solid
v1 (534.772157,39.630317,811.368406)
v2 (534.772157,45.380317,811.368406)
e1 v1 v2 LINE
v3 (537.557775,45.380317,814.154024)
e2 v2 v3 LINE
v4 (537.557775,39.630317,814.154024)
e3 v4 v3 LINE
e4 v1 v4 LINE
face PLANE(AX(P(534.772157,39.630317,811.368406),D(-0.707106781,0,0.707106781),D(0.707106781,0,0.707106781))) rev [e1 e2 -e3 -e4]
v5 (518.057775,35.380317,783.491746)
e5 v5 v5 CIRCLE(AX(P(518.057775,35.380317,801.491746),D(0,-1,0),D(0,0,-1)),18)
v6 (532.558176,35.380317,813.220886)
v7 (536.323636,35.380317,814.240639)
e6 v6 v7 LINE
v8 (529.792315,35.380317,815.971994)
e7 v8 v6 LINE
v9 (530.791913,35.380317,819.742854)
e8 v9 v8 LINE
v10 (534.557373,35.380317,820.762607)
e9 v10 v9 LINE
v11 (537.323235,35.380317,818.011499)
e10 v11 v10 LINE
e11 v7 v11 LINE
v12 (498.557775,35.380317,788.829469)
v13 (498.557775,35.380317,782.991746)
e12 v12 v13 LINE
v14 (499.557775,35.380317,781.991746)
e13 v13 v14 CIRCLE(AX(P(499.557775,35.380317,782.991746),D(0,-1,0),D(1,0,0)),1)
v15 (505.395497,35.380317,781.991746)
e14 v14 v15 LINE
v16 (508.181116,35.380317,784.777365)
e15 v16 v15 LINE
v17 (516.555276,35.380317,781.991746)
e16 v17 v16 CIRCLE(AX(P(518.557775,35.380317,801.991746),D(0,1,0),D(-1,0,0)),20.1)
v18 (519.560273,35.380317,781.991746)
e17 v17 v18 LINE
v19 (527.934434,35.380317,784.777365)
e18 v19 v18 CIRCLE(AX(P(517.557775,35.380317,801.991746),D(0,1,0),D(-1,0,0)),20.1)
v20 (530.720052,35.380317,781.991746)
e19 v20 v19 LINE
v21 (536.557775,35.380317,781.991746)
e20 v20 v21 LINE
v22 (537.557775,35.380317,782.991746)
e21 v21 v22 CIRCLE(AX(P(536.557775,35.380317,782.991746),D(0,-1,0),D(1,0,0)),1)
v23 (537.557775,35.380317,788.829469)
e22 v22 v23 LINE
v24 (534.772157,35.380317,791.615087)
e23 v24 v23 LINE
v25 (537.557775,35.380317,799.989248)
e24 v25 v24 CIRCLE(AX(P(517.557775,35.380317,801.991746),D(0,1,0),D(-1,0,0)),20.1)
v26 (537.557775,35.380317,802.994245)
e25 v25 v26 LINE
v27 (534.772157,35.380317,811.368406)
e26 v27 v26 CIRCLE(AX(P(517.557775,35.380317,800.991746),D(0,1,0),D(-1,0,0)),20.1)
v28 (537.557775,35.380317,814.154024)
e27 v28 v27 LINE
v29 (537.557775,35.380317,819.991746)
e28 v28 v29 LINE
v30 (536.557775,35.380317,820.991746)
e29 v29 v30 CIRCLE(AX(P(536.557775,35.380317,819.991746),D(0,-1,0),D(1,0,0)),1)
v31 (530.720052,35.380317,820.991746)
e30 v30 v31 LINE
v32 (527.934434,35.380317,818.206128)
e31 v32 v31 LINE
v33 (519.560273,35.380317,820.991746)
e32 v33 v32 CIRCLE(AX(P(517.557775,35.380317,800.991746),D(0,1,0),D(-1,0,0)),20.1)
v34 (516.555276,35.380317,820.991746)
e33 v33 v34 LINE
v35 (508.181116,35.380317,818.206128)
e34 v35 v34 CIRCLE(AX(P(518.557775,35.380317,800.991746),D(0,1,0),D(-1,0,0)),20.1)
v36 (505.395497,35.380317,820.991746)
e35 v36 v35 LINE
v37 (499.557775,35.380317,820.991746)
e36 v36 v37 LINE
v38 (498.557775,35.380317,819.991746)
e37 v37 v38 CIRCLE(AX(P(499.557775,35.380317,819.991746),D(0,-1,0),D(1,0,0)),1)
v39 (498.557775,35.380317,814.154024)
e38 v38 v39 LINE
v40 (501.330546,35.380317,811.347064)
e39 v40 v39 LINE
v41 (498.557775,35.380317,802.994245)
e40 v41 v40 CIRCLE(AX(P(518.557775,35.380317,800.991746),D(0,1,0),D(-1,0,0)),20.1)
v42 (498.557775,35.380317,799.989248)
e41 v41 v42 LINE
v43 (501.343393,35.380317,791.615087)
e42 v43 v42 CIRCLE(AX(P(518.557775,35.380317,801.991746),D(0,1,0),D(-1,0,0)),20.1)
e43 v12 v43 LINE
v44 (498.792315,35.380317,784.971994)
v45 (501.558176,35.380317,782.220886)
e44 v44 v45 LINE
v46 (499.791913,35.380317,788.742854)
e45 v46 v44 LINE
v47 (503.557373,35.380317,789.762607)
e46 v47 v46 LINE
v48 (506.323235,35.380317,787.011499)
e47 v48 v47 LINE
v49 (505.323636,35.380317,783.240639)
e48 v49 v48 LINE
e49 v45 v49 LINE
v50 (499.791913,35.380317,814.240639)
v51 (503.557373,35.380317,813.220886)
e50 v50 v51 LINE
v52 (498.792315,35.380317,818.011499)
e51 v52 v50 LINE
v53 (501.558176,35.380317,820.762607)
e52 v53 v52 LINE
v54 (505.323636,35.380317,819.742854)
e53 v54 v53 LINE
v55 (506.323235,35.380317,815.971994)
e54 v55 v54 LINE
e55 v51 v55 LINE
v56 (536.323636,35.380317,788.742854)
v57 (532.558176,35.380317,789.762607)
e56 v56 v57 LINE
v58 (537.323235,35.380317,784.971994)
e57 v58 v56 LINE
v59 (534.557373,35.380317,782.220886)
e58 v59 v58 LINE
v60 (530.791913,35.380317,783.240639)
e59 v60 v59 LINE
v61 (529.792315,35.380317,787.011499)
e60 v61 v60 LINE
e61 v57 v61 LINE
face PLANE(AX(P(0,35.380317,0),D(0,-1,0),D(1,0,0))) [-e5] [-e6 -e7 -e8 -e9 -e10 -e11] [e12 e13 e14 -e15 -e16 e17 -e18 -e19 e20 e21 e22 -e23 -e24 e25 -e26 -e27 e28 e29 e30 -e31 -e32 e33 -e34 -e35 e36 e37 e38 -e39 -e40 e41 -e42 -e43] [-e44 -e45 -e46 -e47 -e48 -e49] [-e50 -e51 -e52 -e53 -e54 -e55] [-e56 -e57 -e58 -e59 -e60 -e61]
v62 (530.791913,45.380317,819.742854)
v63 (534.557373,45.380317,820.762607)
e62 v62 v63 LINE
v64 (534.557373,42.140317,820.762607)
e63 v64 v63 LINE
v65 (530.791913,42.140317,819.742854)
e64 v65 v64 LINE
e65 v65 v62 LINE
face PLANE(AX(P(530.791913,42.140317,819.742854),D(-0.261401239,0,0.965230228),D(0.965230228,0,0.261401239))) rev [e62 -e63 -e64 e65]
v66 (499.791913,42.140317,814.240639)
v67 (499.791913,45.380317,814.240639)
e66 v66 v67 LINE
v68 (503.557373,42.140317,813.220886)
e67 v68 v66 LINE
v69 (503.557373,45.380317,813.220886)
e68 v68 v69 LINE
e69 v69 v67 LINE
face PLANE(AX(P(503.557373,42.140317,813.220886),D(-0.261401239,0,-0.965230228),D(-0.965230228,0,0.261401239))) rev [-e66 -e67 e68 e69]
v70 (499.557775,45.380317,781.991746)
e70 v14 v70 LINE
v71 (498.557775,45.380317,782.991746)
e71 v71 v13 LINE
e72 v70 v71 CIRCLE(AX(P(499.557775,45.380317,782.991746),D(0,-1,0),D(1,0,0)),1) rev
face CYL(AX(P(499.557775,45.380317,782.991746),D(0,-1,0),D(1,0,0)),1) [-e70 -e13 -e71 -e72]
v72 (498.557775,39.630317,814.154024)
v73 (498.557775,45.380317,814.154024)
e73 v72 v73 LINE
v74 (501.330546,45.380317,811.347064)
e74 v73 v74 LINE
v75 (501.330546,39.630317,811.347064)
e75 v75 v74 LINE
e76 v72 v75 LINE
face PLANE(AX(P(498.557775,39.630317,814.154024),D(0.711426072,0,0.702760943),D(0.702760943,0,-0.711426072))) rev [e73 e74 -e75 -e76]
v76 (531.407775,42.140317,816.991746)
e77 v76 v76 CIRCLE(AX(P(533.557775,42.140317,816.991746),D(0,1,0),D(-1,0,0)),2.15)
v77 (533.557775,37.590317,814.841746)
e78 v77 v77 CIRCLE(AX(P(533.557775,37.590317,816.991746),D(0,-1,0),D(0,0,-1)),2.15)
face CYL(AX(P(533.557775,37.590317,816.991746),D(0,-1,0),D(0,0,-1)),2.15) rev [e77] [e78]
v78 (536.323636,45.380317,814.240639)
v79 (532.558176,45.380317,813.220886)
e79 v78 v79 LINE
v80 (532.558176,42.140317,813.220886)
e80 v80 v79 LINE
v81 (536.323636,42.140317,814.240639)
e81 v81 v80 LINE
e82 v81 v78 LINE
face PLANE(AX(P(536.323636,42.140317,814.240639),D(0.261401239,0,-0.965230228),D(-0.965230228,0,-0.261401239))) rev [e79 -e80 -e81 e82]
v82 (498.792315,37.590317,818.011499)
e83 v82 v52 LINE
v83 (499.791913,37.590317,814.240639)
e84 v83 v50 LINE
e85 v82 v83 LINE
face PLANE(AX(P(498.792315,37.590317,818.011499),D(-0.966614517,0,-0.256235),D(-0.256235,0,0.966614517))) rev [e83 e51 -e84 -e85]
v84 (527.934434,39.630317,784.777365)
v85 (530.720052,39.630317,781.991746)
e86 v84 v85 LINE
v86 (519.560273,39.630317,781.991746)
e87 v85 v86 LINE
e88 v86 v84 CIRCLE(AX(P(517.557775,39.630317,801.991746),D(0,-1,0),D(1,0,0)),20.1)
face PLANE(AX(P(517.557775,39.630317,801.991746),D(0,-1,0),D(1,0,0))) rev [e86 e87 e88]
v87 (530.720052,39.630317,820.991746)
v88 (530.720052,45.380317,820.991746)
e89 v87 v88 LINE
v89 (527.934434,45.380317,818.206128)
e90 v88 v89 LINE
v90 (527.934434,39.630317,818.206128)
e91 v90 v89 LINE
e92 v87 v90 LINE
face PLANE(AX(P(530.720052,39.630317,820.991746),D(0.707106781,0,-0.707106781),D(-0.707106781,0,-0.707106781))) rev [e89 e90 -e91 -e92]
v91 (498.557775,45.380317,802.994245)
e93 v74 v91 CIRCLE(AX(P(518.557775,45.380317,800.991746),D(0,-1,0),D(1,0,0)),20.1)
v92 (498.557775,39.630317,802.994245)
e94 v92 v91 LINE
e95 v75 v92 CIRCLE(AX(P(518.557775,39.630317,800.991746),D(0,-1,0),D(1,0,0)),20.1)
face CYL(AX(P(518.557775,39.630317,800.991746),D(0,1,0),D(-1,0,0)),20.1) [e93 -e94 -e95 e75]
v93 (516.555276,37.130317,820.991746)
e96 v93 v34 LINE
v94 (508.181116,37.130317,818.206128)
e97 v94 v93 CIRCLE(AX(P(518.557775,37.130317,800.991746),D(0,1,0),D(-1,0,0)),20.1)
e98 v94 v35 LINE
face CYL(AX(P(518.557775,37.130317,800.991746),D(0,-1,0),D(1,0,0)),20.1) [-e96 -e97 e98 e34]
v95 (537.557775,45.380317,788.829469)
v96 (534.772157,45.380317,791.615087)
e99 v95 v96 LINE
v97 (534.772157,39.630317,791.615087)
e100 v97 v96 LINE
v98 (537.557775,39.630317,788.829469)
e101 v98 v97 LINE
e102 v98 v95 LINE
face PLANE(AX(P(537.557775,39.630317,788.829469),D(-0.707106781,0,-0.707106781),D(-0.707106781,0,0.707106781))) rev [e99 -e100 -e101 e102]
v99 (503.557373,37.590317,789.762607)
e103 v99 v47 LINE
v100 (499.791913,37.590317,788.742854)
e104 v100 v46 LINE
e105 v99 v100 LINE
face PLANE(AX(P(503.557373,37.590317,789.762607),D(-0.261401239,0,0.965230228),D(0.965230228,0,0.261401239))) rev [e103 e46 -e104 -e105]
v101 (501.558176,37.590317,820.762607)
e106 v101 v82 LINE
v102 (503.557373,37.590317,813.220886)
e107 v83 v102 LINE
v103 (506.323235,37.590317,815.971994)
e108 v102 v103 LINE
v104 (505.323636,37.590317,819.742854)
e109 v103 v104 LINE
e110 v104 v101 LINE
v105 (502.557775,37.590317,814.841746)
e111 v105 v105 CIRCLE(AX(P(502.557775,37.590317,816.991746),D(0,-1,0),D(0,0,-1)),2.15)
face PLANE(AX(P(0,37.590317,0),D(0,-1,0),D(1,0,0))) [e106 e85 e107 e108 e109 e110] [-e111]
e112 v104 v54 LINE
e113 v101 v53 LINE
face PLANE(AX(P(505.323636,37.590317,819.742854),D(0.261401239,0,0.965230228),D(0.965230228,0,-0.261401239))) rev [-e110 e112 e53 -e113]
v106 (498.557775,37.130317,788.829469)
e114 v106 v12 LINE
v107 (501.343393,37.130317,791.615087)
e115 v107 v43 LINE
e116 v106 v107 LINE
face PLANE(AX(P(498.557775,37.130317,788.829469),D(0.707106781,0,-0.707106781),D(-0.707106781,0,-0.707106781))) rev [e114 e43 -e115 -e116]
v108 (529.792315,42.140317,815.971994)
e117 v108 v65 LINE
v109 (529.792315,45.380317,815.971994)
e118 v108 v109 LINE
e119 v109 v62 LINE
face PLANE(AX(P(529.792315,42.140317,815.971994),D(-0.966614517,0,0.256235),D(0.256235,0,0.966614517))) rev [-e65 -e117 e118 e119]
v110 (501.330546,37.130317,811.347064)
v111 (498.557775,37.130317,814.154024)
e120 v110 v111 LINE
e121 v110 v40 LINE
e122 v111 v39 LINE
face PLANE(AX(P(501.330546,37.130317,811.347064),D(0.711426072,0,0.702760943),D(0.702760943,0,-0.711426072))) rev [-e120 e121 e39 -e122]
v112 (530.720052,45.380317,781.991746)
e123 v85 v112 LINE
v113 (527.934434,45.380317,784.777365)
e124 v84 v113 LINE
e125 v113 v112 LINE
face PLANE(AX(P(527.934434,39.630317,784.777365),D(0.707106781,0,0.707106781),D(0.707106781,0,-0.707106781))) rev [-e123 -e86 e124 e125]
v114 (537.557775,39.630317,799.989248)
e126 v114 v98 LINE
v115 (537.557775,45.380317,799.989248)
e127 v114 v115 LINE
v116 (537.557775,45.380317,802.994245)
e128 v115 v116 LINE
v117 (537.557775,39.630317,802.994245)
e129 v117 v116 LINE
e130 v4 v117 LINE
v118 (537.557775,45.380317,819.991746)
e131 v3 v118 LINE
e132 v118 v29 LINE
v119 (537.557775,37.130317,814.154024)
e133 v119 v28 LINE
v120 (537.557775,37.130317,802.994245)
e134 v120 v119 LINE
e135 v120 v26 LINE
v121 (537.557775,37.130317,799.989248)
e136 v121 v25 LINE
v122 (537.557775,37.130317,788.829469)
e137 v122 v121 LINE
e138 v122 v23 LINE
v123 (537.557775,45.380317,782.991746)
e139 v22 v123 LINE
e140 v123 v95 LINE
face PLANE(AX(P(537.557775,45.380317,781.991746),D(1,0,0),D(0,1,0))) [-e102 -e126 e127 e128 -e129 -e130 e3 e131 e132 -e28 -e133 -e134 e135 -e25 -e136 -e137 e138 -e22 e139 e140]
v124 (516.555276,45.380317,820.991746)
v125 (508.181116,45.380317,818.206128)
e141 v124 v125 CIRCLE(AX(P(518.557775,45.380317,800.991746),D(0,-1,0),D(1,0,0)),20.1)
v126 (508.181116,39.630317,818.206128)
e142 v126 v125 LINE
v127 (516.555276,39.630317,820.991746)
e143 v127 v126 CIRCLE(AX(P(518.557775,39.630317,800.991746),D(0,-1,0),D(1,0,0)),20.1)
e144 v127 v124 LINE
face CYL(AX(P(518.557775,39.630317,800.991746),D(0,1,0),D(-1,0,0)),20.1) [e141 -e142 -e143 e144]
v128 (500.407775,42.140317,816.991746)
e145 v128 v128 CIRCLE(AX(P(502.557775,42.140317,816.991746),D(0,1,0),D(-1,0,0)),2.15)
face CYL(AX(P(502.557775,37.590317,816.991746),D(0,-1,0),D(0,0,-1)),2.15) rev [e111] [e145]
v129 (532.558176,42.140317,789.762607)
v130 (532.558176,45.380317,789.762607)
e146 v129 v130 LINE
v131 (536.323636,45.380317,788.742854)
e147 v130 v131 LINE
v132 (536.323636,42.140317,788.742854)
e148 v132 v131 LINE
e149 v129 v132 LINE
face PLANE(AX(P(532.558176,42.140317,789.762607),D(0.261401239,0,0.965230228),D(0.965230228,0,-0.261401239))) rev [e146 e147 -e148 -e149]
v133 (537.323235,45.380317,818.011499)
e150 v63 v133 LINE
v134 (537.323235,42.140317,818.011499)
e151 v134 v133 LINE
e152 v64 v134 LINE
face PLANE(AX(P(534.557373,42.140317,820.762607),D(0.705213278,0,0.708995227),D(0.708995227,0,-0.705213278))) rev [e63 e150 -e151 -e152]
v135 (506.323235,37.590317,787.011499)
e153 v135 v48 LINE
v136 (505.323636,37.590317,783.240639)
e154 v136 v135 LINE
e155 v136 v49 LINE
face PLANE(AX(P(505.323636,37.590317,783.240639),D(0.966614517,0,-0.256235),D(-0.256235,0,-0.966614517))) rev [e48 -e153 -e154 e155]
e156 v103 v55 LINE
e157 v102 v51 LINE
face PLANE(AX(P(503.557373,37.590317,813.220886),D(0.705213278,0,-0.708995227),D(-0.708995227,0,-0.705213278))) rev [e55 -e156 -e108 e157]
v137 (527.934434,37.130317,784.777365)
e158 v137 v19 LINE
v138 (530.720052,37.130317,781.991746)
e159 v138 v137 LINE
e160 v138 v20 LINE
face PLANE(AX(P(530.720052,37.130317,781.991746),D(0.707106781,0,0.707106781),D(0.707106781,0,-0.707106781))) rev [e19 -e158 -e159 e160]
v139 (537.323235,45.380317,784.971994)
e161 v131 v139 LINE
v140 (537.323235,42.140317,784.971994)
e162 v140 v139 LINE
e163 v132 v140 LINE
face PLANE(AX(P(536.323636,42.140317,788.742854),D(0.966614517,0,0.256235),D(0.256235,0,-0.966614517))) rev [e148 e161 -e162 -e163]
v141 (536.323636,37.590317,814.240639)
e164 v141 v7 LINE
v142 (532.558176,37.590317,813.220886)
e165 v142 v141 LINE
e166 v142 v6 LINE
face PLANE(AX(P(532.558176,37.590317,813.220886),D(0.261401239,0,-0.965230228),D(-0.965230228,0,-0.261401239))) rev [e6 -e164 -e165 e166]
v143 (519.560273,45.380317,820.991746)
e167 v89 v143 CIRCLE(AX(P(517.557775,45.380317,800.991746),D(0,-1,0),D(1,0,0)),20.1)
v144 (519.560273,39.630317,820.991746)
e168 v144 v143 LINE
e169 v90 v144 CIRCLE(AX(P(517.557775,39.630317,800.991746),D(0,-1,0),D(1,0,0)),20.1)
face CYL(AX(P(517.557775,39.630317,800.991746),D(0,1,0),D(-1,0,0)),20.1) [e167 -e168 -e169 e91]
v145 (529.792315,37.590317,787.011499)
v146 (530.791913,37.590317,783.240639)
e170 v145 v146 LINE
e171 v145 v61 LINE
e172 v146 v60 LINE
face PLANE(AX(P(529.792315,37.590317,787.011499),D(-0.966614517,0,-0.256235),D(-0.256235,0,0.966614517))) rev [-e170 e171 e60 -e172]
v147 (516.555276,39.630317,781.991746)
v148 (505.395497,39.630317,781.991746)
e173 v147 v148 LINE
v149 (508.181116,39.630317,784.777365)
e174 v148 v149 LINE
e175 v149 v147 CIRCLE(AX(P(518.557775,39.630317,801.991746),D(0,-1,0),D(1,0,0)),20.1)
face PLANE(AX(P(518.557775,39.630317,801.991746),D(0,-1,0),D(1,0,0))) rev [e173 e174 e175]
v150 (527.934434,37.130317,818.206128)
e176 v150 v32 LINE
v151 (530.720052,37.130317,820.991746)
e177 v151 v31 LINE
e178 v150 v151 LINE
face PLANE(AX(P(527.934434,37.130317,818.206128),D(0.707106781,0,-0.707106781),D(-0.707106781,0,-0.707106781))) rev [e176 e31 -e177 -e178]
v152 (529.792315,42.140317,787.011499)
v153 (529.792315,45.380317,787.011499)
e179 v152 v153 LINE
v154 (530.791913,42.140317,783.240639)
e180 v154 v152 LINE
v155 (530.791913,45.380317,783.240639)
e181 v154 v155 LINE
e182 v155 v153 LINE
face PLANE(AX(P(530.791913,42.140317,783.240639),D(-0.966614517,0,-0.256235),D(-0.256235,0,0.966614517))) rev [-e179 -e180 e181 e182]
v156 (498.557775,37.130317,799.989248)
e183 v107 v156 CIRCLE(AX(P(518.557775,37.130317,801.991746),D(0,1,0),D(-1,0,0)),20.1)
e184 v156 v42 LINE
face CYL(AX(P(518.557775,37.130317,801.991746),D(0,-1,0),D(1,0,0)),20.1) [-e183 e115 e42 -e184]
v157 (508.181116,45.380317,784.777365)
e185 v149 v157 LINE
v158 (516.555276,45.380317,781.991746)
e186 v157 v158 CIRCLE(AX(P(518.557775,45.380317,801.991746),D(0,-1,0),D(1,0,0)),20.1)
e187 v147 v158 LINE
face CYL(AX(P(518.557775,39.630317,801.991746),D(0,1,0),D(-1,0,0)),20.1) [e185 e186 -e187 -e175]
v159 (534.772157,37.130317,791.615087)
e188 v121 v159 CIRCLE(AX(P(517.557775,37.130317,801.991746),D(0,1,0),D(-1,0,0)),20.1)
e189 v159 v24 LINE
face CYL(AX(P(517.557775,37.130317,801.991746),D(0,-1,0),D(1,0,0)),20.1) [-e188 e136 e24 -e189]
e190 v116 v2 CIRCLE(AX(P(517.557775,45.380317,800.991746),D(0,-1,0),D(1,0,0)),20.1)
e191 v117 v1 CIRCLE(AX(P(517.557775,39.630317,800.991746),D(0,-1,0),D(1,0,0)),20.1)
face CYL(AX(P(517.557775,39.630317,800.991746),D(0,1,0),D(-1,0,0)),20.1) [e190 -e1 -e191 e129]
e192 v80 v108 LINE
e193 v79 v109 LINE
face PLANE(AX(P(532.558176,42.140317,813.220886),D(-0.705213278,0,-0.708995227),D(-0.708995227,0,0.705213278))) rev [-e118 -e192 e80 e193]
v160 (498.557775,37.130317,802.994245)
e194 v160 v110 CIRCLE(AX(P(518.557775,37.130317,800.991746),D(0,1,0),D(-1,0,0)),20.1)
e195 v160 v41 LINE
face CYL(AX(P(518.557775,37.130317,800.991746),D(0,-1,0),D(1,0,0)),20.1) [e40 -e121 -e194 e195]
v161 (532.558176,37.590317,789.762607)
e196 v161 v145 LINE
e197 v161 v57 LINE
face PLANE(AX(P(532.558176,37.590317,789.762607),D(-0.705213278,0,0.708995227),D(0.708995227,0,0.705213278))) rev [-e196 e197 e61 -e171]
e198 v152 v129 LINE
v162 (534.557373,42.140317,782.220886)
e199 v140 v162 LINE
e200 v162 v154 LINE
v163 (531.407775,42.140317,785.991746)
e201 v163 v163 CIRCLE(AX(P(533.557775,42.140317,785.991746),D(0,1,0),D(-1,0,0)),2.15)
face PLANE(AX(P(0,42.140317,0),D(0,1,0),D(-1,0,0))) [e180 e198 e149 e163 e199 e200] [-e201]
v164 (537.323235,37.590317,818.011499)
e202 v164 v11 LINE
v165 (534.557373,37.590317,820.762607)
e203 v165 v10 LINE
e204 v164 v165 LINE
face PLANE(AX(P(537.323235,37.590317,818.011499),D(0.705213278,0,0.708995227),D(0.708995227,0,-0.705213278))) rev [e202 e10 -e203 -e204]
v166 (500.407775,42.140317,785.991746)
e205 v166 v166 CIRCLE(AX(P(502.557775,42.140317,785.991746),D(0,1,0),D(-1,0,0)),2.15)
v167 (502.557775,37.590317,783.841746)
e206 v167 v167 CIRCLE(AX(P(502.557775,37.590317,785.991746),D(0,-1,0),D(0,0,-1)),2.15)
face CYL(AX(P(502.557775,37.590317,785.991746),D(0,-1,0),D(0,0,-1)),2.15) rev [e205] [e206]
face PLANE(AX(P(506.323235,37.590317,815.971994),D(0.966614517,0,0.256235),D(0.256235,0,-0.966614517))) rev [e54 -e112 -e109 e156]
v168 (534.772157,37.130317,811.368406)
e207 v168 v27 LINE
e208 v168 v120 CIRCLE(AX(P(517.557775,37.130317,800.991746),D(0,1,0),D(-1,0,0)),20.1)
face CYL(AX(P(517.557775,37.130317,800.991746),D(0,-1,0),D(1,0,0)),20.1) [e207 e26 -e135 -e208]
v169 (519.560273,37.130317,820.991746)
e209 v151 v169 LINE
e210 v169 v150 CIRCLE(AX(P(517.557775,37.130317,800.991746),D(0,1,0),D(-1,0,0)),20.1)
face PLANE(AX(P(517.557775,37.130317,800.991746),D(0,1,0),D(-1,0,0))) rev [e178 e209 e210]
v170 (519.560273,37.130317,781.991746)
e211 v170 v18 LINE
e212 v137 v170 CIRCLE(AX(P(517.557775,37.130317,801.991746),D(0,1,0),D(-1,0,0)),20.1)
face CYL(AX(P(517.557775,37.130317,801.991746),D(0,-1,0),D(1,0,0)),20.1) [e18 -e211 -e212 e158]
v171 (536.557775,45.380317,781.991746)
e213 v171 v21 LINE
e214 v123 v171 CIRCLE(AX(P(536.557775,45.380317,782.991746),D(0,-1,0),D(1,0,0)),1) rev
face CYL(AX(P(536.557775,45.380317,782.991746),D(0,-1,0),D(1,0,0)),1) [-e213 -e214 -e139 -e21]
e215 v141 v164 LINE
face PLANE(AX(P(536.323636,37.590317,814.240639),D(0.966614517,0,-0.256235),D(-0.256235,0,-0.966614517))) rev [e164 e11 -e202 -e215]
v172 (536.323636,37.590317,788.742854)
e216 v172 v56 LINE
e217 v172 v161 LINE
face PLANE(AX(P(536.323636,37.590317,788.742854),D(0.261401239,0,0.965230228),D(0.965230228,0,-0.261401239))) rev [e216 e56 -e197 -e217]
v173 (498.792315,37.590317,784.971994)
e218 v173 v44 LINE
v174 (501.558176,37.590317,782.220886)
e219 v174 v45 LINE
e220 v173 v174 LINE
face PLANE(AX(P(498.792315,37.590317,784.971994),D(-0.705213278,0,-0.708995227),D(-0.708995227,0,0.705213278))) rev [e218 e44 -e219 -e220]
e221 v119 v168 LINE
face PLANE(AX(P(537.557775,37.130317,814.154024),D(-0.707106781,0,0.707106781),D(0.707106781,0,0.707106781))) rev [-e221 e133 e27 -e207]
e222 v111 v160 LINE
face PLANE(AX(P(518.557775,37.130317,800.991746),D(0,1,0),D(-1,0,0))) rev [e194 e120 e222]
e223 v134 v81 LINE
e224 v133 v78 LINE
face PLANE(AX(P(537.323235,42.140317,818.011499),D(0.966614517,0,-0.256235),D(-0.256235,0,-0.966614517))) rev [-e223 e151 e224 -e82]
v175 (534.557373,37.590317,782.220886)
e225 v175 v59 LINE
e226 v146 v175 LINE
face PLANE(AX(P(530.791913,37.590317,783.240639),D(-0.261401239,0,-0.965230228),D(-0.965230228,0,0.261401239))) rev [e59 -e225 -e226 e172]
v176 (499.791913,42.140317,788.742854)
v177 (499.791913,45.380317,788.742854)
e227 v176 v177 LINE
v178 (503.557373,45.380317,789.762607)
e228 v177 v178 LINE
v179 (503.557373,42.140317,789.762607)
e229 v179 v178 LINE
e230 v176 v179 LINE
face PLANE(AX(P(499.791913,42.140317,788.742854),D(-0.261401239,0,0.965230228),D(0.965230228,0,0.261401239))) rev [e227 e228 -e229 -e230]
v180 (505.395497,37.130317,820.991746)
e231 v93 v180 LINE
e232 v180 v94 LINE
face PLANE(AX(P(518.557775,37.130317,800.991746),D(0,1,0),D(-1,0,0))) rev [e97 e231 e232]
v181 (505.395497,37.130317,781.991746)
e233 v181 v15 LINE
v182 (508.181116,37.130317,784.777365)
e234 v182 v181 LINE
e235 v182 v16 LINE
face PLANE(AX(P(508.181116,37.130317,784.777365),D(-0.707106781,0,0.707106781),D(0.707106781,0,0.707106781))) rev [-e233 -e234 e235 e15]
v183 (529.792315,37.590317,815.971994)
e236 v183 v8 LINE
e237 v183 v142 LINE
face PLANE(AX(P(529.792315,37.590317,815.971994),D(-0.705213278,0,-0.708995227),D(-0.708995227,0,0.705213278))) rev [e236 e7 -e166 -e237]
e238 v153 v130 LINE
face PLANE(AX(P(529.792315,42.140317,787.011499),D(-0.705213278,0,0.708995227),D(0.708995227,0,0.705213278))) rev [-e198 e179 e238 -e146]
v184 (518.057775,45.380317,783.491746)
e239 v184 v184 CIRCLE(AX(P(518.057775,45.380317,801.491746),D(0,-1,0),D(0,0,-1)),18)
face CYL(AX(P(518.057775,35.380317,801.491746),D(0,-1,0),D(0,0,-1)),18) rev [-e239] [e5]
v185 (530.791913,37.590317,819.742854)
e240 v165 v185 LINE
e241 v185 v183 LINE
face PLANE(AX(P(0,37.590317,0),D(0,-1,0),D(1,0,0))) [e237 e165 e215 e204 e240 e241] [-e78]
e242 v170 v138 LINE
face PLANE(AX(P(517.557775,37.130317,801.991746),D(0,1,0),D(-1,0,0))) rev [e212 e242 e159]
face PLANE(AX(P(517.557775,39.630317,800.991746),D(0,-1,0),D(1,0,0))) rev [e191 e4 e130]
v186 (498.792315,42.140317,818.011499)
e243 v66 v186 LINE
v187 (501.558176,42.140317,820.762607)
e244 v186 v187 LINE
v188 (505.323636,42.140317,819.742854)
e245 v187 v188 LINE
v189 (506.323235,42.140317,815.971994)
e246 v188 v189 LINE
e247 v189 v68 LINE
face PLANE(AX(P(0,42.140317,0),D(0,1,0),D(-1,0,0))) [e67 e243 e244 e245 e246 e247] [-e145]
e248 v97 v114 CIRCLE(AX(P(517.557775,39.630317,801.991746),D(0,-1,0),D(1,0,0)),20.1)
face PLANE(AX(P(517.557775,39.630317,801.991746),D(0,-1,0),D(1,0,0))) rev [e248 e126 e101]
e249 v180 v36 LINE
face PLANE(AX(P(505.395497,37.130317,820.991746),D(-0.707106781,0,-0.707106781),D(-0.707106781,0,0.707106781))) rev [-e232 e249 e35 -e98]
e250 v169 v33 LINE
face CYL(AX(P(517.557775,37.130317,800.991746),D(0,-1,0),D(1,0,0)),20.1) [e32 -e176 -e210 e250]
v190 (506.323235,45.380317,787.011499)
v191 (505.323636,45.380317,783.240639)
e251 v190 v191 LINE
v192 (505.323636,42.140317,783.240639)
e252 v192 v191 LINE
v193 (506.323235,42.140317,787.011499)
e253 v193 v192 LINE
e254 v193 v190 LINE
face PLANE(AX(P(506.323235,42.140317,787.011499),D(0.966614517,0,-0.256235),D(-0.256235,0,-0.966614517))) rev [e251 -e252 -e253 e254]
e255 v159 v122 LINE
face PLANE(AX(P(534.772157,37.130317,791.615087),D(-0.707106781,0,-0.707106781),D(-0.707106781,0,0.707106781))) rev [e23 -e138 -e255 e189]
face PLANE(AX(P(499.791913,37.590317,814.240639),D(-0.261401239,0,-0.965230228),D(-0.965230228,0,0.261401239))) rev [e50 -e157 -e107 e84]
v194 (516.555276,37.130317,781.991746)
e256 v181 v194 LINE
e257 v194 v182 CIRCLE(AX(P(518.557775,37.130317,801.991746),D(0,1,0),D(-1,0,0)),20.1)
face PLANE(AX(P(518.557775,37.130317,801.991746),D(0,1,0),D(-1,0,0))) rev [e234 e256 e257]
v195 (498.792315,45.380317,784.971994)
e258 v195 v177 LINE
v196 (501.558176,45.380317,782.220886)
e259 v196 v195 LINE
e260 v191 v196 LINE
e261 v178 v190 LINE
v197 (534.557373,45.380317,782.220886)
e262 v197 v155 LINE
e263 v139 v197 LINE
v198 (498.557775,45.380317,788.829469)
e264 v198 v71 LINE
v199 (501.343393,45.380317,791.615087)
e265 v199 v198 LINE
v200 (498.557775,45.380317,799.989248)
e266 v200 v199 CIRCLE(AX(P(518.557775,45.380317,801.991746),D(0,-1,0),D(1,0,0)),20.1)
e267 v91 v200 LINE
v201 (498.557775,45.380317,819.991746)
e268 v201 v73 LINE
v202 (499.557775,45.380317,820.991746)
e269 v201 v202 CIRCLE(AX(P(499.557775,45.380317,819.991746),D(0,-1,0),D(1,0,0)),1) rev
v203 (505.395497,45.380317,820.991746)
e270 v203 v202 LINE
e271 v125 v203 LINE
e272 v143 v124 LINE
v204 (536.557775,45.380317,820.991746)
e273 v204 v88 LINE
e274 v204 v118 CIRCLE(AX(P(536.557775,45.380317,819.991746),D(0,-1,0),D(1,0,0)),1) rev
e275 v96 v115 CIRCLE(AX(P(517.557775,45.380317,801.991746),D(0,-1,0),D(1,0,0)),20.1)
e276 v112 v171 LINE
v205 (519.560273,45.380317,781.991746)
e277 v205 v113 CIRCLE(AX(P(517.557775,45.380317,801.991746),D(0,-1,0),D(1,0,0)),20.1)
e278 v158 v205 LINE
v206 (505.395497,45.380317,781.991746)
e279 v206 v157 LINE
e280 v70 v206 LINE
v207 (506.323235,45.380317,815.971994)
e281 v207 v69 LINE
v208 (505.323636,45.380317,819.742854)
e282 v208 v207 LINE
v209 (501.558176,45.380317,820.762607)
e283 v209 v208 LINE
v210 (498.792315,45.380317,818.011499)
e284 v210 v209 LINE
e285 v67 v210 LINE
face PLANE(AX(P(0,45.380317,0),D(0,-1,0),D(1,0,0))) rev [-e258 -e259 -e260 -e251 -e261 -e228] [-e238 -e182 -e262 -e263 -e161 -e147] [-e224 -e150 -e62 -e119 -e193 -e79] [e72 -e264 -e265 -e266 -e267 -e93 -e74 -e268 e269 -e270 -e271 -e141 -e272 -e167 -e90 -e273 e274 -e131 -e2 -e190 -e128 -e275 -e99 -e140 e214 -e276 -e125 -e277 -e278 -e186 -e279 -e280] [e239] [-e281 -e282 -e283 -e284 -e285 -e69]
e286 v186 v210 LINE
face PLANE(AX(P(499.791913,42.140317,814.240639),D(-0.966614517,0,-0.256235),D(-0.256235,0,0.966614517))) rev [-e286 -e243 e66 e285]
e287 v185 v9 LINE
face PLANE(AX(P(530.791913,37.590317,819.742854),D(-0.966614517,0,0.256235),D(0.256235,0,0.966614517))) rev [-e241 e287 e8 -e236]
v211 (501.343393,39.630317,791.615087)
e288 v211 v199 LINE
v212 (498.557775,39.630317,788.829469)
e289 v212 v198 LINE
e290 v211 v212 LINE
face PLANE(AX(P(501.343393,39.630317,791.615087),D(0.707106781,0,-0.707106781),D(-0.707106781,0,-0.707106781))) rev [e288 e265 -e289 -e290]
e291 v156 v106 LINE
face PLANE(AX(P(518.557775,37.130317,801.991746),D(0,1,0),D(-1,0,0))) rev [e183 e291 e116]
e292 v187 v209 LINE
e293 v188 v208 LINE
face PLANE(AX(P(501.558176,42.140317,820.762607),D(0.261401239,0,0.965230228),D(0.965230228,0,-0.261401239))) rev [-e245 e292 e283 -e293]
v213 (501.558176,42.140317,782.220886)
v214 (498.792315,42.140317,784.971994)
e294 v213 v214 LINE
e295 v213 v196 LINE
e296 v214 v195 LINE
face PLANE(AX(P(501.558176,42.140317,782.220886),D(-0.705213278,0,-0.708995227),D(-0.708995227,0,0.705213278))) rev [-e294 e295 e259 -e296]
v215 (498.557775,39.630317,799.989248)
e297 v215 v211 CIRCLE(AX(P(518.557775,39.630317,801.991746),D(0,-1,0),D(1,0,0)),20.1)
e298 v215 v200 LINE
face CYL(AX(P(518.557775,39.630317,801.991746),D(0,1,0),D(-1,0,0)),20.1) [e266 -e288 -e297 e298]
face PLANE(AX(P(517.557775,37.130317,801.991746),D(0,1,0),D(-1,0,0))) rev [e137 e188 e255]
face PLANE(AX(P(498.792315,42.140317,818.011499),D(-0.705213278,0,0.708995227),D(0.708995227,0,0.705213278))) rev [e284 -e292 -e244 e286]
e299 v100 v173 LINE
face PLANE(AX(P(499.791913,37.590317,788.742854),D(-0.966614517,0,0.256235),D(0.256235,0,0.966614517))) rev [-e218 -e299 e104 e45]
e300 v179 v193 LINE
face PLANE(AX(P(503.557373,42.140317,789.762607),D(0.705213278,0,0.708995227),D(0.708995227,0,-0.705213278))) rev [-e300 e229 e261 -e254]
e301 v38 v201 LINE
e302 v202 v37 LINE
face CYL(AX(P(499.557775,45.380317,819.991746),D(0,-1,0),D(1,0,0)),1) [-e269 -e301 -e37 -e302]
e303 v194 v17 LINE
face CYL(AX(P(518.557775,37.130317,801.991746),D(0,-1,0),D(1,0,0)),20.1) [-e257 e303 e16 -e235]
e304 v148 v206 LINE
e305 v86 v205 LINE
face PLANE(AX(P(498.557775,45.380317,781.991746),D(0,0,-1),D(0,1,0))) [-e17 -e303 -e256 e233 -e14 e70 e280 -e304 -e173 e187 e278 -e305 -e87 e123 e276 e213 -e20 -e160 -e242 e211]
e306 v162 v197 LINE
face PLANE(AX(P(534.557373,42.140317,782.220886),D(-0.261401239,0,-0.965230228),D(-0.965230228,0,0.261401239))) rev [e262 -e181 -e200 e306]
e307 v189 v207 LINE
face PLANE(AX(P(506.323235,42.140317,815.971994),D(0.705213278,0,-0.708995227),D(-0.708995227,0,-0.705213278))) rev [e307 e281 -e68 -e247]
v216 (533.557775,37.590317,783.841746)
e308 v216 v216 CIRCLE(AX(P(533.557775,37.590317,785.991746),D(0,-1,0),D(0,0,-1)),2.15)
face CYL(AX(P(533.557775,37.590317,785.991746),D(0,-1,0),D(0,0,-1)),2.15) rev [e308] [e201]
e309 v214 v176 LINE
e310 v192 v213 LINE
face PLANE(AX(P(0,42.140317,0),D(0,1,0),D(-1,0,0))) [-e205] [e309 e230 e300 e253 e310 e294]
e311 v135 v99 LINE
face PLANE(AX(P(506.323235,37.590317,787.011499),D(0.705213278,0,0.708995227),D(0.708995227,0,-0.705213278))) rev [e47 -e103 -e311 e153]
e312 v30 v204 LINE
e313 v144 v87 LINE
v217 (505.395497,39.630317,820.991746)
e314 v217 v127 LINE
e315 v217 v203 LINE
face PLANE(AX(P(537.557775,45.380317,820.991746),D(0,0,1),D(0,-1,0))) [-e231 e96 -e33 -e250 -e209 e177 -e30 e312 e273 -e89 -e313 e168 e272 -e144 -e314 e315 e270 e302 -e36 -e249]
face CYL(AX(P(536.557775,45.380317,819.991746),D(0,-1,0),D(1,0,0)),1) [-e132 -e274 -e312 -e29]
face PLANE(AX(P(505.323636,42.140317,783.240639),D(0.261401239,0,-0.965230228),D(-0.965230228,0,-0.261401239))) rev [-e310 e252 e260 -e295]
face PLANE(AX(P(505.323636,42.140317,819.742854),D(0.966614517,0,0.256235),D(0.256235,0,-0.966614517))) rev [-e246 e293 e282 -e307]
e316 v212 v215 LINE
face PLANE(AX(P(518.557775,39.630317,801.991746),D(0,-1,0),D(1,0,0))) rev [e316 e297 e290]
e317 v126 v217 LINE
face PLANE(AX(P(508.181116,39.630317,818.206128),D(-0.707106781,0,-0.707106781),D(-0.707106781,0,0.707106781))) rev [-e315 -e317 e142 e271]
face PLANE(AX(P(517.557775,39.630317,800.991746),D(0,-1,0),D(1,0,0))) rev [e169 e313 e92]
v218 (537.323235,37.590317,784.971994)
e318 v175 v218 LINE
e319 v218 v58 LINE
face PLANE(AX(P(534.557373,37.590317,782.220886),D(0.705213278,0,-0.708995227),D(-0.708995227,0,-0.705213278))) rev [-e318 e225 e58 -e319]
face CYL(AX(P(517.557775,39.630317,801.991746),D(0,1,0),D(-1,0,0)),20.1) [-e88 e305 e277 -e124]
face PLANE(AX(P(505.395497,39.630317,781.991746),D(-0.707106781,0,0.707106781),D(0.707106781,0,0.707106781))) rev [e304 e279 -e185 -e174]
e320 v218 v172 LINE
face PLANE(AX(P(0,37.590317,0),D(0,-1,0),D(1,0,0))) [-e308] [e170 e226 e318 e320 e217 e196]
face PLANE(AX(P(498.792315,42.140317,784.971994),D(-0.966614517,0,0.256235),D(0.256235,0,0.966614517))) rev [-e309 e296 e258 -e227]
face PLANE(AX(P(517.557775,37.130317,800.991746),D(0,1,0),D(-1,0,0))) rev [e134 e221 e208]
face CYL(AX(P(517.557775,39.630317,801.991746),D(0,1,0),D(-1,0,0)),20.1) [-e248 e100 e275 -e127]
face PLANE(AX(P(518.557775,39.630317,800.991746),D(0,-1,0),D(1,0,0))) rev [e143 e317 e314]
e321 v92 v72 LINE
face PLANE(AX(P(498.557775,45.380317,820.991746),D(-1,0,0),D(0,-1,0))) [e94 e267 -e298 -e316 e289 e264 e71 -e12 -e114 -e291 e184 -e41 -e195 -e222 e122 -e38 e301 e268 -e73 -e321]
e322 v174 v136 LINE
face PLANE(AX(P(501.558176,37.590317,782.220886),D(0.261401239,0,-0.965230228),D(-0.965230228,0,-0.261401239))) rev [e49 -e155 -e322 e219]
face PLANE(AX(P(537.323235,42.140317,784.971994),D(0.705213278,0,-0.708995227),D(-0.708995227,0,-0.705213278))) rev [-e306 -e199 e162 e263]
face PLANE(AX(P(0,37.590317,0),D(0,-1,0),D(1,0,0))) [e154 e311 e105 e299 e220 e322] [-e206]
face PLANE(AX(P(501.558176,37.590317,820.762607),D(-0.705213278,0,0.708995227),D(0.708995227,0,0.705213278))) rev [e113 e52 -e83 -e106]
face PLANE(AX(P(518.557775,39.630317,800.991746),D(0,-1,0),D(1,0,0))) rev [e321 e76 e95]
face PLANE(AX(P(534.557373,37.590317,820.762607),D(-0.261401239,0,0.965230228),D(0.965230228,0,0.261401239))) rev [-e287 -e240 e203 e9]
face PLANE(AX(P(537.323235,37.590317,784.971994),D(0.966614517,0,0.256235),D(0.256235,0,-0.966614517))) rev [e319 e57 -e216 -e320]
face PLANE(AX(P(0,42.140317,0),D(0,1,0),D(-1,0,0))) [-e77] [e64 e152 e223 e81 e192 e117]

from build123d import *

# Parameters (mm, degrees)
SKETCH1_W                      = 39
SKETCH1_H                      = 39
BOSS_EXTRUDE1_DEPTH            = 10
CUT_EXTRUDE1_DEPTH             = 5.75
CUT_EXTRUDE2_START             = -1.75
CUT_EXTRUDE2_DEPTH             = 1.75
CUT_EXTRUDE3_DEPTH             = 1.75
CUT_EXTRUDE4_START             = -5.75
CUT_EXTRUDE4_DEPTH             = 5.75
CUT_EXTRUDE5_START             = -1.75
CUT_EXTRUDE5_DEPTH             = 1.75
CUT_EXTRUDE6_DEPTH             = 5.75
CUT_EXTRUDE7_DEPTH             = 5.75
CUT_EXTRUDE8_START             = -1.75
CUT_EXTRUDE8_DEPTH             = 1.75
CUT_EXTRUDE9_START             = -1.75
CUT_EXTRUDE9_DEPTH             = 1.75
CUT_EXTRUDE10_DEPTH            = 5.75
CUT_EXTRUDE11_DEPTH            = 5.75
CUT_EXTRUDE12_START            = -1.75
CUT_EXTRUDE12_DEPTH            = 1.75
CUT_EXTRUDE13_START            = -5.75
CUT_EXTRUDE13_DEPTH            = 5.75
CUT_EXTRUDE14_DEPTH            = 1.75
CUT_EXTRUDE15_START            = -1.75
CUT_EXTRUDE15_DEPTH            = 1.75
CUT_EXTRUDE16_DEPTH            = 5.75
CUT_EXTRUDE17_DEPTH            = 2.21
CUT_EXTRUDE18_DEPTH            = 2.21
CUT_EXTRUDE19_DEPTH            = 2.21
CUT_EXTRUDE20_DEPTH            = 2.21
CUT_EXTRUDE21_DEPTH            = 3.24
CUT_EXTRUDE22_DEPTH            = 3.24
CUT_EXTRUDE23_DEPTH            = 3.24
CUT_EXTRUDE24_DEPTH            = 3.24
M33_CLEARANCE_HOLE1_D          = 36
F_4_3_4_3_DIAMETER_HOLE1_D     = 4.3
F_4_3_4_3_DIAMETER_HOLE1_DEPTH = 7.79
FILLET1_R                      = 1


with BuildPart() as part:
    # Sketch1 → Boss-Extrude1 (new body)
    with BuildSketch(Plane.XZ.offset(-35.380317461)):
        with Locations((518.057774839, 801.49174641)):
            Rectangle(SKETCH1_W, SKETCH1_H)
    extrude(amount=-BOSS_EXTRUDE1_DEPTH)

    # Sketch2 → Cut-Extrude1 (cut)
    with BuildSketch(Plane(origin=(0, 45.380317461, 0), x_dir=(-1, 0, 0), z_dir=(0, 1, 0))):
        with BuildLine():
            Line((-505.395497413, 781.99174641), (-508.181115567, 784.777364563))
            ThreePointArc((-508.181115567, 784.777364563), (-512.213422741, 782.919274193), (-516.555276399, 781.99174641))
            Line((-516.555276399, 781.99174641), (-505.395497413, 781.99174641))
        make_face()
    extrude(amount=-CUT_EXTRUDE1_DEPTH, mode=Mode.SUBTRACT)

    # Sketch3 → Cut-Extrude2 (cut)
    with BuildSketch(Plane.XZ.offset(-35.380317461).offset(CUT_EXTRUDE2_START)):
        with BuildLine():
            Line((508.181115567, 784.777364563), (505.395497413, 781.99174641))
            Line((505.395497413, 781.99174641), (516.555276399, 781.99174641))
            ThreePointArc((516.555276399, 781.99174641), (512.213422741, 782.919274193), (508.181115567, 784.777364563))
        make_face()
    extrude(amount=CUT_EXTRUDE2_DEPTH, mode=Mode.SUBTRACT)

    # Sketch4 → Cut-Extrude3 (cut)
    with BuildSketch(Plane.XZ.offset(-35.380317461)):
        with BuildLine():
            Line((530.720052265, 781.99174641), (527.934434111, 784.777364563))
            ThreePointArc((527.934434111, 784.777364563), (523.902126936, 782.919274193), (519.560273278, 781.99174641))
            Line((519.560273278, 781.99174641), (530.720052265, 781.99174641))
        make_face()
    extrude(amount=-CUT_EXTRUDE3_DEPTH, mode=Mode.SUBTRACT)

    # Sketch5 → Cut-Extrude4 (cut)
    with BuildSketch(Plane(origin=(0, 45.380317461, 0), x_dir=(-1, 0, 0), z_dir=(0, 1, 0)).offset(CUT_EXTRUDE4_START)):
        with BuildLine():
            Line((-527.934434111, 784.777364563), (-530.720052265, 781.99174641))
            Line((-530.720052265, 781.99174641), (-519.560273278, 781.99174641))
            ThreePointArc((-519.560273278, 781.99174641), (-523.902126936, 782.919274193), (-527.934434111, 784.777364563))
        make_face()
    extrude(amount=CUT_EXTRUDE4_DEPTH, mode=Mode.SUBTRACT)

    # Sketch6 → Cut-Extrude5 (cut)
    with BuildSketch(Plane.XZ.offset(-35.380317461).offset(CUT_EXTRUDE5_START)):
        with BuildLine():
            Line((498.557774839, 788.829468984), (501.343392993, 791.615087137))
            ThreePointArc((501.343392993, 791.615087137), (499.485302622, 795.647394312), (498.557774839, 799.98924797))
            Line((498.557774839, 799.98924797), (498.557774839, 788.829468984))
        make_face()
    extrude(amount=CUT_EXTRUDE5_DEPTH, mode=Mode.SUBTRACT)

    # Sketch7 → Cut-Extrude6 (cut)
    with BuildSketch(Plane(origin=(0, 45.380317461, 0), x_dir=(-1, 0, 0), z_dir=(0, 1, 0))):
        with BuildLine():
            Line((-501.343392993, 791.615087137), (-498.557774839, 788.829468984))
            Line((-498.557774839, 788.829468984), (-498.557774839, 799.98924797))
            ThreePointArc((-498.557774839, 799.98924797), (-499.485302622, 795.647394312), (-501.343392993, 791.615087137))
        make_face()
    extrude(amount=-CUT_EXTRUDE6_DEPTH, mode=Mode.SUBTRACT)

    # Sketch8 → Cut-Extrude7 (cut)
    with BuildSketch(Plane(origin=(0, 45.380317461, 0), x_dir=(-1, 0, 0), z_dir=(0, 1, 0))):
        with BuildLine():
            Line((-498.557774839, 814.154023836), (-501.330546311, 811.347063751))
            ThreePointArc((-501.330546311, 811.347063751), (-499.481374972, 807.32427893), (-498.557774839, 802.994244849))
            Line((-498.557774839, 802.994244849), (-498.557774839, 814.154023836))
        make_face()
    extrude(amount=-CUT_EXTRUDE7_DEPTH, mode=Mode.SUBTRACT)

    # Sketch9 → Cut-Extrude8 (cut)
    with BuildSketch(Plane.XZ.offset(-35.380317461).offset(CUT_EXTRUDE8_START)):
        with BuildLine():
            Line((501.330546311, 811.347063751), (498.557774839, 814.154023836))
            Line((498.557774839, 814.154023836), (498.557774839, 802.994244849))
            ThreePointArc((498.557774839, 802.994244849), (499.481374972, 807.32427893), (501.330546311, 811.347063751))
        make_face()
    extrude(amount=CUT_EXTRUDE8_DEPTH, mode=Mode.SUBTRACT)

    # Sketch10 → Cut-Extrude9 (cut)
    with BuildSketch(Plane.XZ.offset(-35.380317461).offset(CUT_EXTRUDE9_START)):
        with BuildLine():
            Line((505.395497413, 820.99174641), (508.181115567, 818.206128256))
            ThreePointArc((508.181115567, 818.206128256), (512.213422741, 820.064218627), (516.555276399, 820.99174641))
            Line((516.555276399, 820.99174641), (505.395497413, 820.99174641))
        make_face()
    extrude(amount=CUT_EXTRUDE9_DEPTH, mode=Mode.SUBTRACT)

    # Sketch11 → Cut-Extrude10 (cut)
    with BuildSketch(Plane(origin=(0, 45.380317461, 0), x_dir=(-1, 0, 0), z_dir=(0, 1, 0))):
        with BuildLine():
            Line((-508.181115567, 818.206128256), (-505.395497413, 820.99174641))
            Line((-505.395497413, 820.99174641), (-516.555276399, 820.99174641))
            ThreePointArc((-516.555276399, 820.99174641), (-512.213422741, 820.064218627), (-508.181115567, 818.206128256))
        make_face()
    extrude(amount=-CUT_EXTRUDE10_DEPTH, mode=Mode.SUBTRACT)

    # Sketch12 → Cut-Extrude11 (cut)
    with BuildSketch(Plane(origin=(0, 45.380317461, 0), x_dir=(-1, 0, 0), z_dir=(0, 1, 0))):
        with BuildLine():
            Line((-530.720052265, 820.99174641), (-527.934434111, 818.206128256))
            ThreePointArc((-527.934434111, 818.206128256), (-523.902126936, 820.064218627), (-519.560273278, 820.99174641))
            Line((-519.560273278, 820.99174641), (-530.720052265, 820.99174641))
        make_face()
    extrude(amount=-CUT_EXTRUDE11_DEPTH, mode=Mode.SUBTRACT)

    # Sketch13 → Cut-Extrude12 (cut)
    with BuildSketch(Plane.XZ.offset(-35.380317461).offset(CUT_EXTRUDE12_START)):
        with BuildLine():
            Line((527.934434111, 818.206128256), (530.720052265, 820.99174641))
            Line((530.720052265, 820.99174641), (519.560273278, 820.99174641))
            ThreePointArc((519.560273278, 820.99174641), (523.902126936, 820.064218627), (527.934434111, 818.206128256))
        make_face()
    extrude(amount=CUT_EXTRUDE12_DEPTH, mode=Mode.SUBTRACT)

    # Sketch14 → Cut-Extrude13 (cut)
    with BuildSketch(Plane(origin=(0, 45.380317461, 0), x_dir=(-1, 0, 0), z_dir=(0, 1, 0)).offset(CUT_EXTRUDE13_START)):
        with BuildLine():
            Line((-537.557774839, 788.829468984), (-534.772156685, 791.615087137))
            ThreePointArc((-534.772156685, 791.615087137), (-536.630247056, 795.647394312), (-537.557774839, 799.98924797))
            Line((-537.557774839, 799.98924797), (-537.557774839, 788.829468984))
        make_face()
    extrude(amount=CUT_EXTRUDE13_DEPTH, mode=Mode.SUBTRACT)

    # Sketch15 → Cut-Extrude14 (cut)
    with BuildSketch(Plane.XZ.offset(-35.380317461)):
        with BuildLine():
            Line((534.772156685, 791.615087137), (537.557774839, 788.829468984))
            Line((537.557774839, 788.829468984), (537.557774839, 799.98924797))
            ThreePointArc((537.557774839, 799.98924797), (536.630247056, 795.647394312), (534.772156685, 791.615087137))
        make_face()
    extrude(amount=-CUT_EXTRUDE14_DEPTH, mode=Mode.SUBTRACT)

    # Sketch16 → Cut-Extrude15 (cut)
    with BuildSketch(Plane.XZ.offset(-35.380317461).offset(CUT_EXTRUDE15_START)):
        with BuildLine():
            Line((537.557774839, 814.154023836), (534.772156685, 811.368405682))
            ThreePointArc((534.772156685, 811.368405682), (536.630247056, 807.336098507), (537.557774839, 802.994244849))
            Line((537.557774839, 802.994244849), (537.557774839, 814.154023836))
        make_face()
    extrude(amount=CUT_EXTRUDE15_DEPTH, mode=Mode.SUBTRACT)

    # Sketch17 → Cut-Extrude16 (cut)
    with BuildSketch(Plane(origin=(0, 45.380317461, 0), x_dir=(-1, 0, 0), z_dir=(0, 1, 0))):
        with BuildLine():
            Line((-534.772156685, 811.368405682), (-537.557774839, 814.154023836))
            Line((-537.557774839, 814.154023836), (-537.557774839, 802.994244849))
            ThreePointArc((-537.557774839, 802.994244849), (-536.630247056, 807.336098507), (-534.772156685, 811.368405682))
        make_face()
    extrude(amount=-CUT_EXTRUDE16_DEPTH, mode=Mode.SUBTRACT)

    # Sketch18 → Cut-Extrude17 (cut)
    with BuildSketch(Plane.XZ.offset(-35.380317461)):
        Polygon((536.323636481, 814.240638531), (537.323234972, 818.011498916), (534.557373329, 820.762606795), (530.791913196, 819.742854289), (529.792314706, 815.971993903), (532.558176349, 813.220886024), align=None)
    extrude(amount=-CUT_EXTRUDE17_DEPTH, mode=Mode.SUBTRACT)

    # Sketch19 → Cut-Extrude18 (cut)
    with BuildSketch(Plane.XZ.offset(-35.380317461)):
        Polygon((498.792314706, 818.011498916), (499.791913196, 814.240638531), (503.557373329, 813.220886024), (506.323234972, 815.971993903), (505.323636481, 819.742854289), (501.558176349, 820.762606795), align=None)
    extrude(amount=-CUT_EXTRUDE18_DEPTH, mode=Mode.SUBTRACT)

    # Sketch20 → Cut-Extrude19 (cut)
    with BuildSketch(Plane.XZ.offset(-35.380317461)):
        Polygon((499.791913196, 788.742854289), (498.792314706, 784.971993903), (501.558176349, 782.220886024), (505.323636481, 783.240638531), (506.323234972, 787.011498916), (503.557373329, 789.762606795), align=None)
    extrude(amount=-CUT_EXTRUDE19_DEPTH, mode=Mode.SUBTRACT)

    # Sketch21 → Cut-Extrude20 (cut)
    with BuildSketch(Plane.XZ.offset(-35.380317461)):
        Polygon((537.323234972, 784.971993903), (536.323636481, 788.742854289), (532.558176349, 789.762606795), (529.792314706, 787.011498916), (530.791913196, 783.240638531), (534.557373329, 782.220886024), align=None)
    extrude(amount=-CUT_EXTRUDE20_DEPTH, mode=Mode.SUBTRACT)

    # Sketch22 → Cut-Extrude21 (cut)
    with BuildSketch(Plane(origin=(0, 45.380317461, 0), x_dir=(-1, 0, 0), z_dir=(0, 1, 0))):
        Polygon((-529.792314706, 787.011498916), (-532.558176349, 789.762606795), (-536.323636481, 788.742854289), (-537.323234972, 784.971993903), (-534.557373329, 782.220886024), (-530.791913196, 783.240638531), align=None)
    extrude(amount=-CUT_EXTRUDE21_DEPTH, mode=Mode.SUBTRACT)

    # Sketch23 → Cut-Extrude22 (cut)
    with BuildSketch(Plane(origin=(0, 45.380317461, 0), x_dir=(-1, 0, 0), z_dir=(0, 1, 0))):
        Polygon((-503.557373329, 789.762606795), (-506.323234972, 787.011498916), (-505.323636481, 783.240638531), (-501.558176349, 782.220886024), (-498.792314706, 784.971993903), (-499.791913196, 788.742854289), align=None)
    extrude(amount=-CUT_EXTRUDE22_DEPTH, mode=Mode.SUBTRACT)

    # Sketch24 → Cut-Extrude23 (cut)
    with BuildSketch(Plane(origin=(0, 45.380317461, 0), x_dir=(-1, 0, 0), z_dir=(0, 1, 0))):
        Polygon((-506.323234972, 815.971993903), (-503.557373329, 813.220886024), (-499.791913196, 814.240638531), (-498.792314706, 818.011498916), (-501.558176349, 820.762606795), (-505.323636481, 819.742854289), align=None)
    extrude(amount=-CUT_EXTRUDE23_DEPTH, mode=Mode.SUBTRACT)

    # Sketch25 → Cut-Extrude24 (cut)
    with BuildSketch(Plane(origin=(0, 45.380317461, 0), x_dir=(-1, 0, 0), z_dir=(0, 1, 0))):
        Polygon((-532.558176349, 813.220886024), (-529.792314706, 815.971993903), (-530.791913196, 819.742854289), (-534.557373329, 820.762606795), (-537.323234972, 818.011498916), (-536.323636481, 814.240638531), align=None)
    extrude(amount=-CUT_EXTRUDE24_DEPTH, mode=Mode.SUBTRACT)

    # M33 Clearance Hole1 (through all)
    with Locations(Plane(origin=(0, 35.380317461, 0), x_dir=(-1, 0, 0), z_dir=(0, -1, 0))):
        with Locations((-518.057774839, -801.49174641)):
            Hole(M33_CLEARANCE_HOLE1_D / 2)

    # Ø4.3 (4.3) Diameter Hole1
    with Locations(Plane(origin=(0, 37.590317461, 0), x_dir=(-1, 0, 0), z_dir=(0, -1, 0))):
        with Locations((-533.557774839, -785.99174641), (-502.557774839, -785.99174641), (-502.557774839, -816.99174641), (-533.557774839, -816.99174641)):
            Hole(F_4_3_4_3_DIAMETER_HOLE1_D / 2, depth=F_4_3_4_3_DIAMETER_HOLE1_DEPTH)

    # Fillet1
    fillet1_edges = [part.edges().sort_by_distance(p)[0] for p in [
        (498.557774839, 40.380317461, 820.99174641),
        (537.557774839, 40.380317461, 820.99174641),
        (537.557774839, 40.380317461, 781.99174641),
        (498.557774839, 40.380317461, 781.99174641),
    ]]
    fillet(fillet1_edges, radius=FILLET1_R)


solid = part.part
